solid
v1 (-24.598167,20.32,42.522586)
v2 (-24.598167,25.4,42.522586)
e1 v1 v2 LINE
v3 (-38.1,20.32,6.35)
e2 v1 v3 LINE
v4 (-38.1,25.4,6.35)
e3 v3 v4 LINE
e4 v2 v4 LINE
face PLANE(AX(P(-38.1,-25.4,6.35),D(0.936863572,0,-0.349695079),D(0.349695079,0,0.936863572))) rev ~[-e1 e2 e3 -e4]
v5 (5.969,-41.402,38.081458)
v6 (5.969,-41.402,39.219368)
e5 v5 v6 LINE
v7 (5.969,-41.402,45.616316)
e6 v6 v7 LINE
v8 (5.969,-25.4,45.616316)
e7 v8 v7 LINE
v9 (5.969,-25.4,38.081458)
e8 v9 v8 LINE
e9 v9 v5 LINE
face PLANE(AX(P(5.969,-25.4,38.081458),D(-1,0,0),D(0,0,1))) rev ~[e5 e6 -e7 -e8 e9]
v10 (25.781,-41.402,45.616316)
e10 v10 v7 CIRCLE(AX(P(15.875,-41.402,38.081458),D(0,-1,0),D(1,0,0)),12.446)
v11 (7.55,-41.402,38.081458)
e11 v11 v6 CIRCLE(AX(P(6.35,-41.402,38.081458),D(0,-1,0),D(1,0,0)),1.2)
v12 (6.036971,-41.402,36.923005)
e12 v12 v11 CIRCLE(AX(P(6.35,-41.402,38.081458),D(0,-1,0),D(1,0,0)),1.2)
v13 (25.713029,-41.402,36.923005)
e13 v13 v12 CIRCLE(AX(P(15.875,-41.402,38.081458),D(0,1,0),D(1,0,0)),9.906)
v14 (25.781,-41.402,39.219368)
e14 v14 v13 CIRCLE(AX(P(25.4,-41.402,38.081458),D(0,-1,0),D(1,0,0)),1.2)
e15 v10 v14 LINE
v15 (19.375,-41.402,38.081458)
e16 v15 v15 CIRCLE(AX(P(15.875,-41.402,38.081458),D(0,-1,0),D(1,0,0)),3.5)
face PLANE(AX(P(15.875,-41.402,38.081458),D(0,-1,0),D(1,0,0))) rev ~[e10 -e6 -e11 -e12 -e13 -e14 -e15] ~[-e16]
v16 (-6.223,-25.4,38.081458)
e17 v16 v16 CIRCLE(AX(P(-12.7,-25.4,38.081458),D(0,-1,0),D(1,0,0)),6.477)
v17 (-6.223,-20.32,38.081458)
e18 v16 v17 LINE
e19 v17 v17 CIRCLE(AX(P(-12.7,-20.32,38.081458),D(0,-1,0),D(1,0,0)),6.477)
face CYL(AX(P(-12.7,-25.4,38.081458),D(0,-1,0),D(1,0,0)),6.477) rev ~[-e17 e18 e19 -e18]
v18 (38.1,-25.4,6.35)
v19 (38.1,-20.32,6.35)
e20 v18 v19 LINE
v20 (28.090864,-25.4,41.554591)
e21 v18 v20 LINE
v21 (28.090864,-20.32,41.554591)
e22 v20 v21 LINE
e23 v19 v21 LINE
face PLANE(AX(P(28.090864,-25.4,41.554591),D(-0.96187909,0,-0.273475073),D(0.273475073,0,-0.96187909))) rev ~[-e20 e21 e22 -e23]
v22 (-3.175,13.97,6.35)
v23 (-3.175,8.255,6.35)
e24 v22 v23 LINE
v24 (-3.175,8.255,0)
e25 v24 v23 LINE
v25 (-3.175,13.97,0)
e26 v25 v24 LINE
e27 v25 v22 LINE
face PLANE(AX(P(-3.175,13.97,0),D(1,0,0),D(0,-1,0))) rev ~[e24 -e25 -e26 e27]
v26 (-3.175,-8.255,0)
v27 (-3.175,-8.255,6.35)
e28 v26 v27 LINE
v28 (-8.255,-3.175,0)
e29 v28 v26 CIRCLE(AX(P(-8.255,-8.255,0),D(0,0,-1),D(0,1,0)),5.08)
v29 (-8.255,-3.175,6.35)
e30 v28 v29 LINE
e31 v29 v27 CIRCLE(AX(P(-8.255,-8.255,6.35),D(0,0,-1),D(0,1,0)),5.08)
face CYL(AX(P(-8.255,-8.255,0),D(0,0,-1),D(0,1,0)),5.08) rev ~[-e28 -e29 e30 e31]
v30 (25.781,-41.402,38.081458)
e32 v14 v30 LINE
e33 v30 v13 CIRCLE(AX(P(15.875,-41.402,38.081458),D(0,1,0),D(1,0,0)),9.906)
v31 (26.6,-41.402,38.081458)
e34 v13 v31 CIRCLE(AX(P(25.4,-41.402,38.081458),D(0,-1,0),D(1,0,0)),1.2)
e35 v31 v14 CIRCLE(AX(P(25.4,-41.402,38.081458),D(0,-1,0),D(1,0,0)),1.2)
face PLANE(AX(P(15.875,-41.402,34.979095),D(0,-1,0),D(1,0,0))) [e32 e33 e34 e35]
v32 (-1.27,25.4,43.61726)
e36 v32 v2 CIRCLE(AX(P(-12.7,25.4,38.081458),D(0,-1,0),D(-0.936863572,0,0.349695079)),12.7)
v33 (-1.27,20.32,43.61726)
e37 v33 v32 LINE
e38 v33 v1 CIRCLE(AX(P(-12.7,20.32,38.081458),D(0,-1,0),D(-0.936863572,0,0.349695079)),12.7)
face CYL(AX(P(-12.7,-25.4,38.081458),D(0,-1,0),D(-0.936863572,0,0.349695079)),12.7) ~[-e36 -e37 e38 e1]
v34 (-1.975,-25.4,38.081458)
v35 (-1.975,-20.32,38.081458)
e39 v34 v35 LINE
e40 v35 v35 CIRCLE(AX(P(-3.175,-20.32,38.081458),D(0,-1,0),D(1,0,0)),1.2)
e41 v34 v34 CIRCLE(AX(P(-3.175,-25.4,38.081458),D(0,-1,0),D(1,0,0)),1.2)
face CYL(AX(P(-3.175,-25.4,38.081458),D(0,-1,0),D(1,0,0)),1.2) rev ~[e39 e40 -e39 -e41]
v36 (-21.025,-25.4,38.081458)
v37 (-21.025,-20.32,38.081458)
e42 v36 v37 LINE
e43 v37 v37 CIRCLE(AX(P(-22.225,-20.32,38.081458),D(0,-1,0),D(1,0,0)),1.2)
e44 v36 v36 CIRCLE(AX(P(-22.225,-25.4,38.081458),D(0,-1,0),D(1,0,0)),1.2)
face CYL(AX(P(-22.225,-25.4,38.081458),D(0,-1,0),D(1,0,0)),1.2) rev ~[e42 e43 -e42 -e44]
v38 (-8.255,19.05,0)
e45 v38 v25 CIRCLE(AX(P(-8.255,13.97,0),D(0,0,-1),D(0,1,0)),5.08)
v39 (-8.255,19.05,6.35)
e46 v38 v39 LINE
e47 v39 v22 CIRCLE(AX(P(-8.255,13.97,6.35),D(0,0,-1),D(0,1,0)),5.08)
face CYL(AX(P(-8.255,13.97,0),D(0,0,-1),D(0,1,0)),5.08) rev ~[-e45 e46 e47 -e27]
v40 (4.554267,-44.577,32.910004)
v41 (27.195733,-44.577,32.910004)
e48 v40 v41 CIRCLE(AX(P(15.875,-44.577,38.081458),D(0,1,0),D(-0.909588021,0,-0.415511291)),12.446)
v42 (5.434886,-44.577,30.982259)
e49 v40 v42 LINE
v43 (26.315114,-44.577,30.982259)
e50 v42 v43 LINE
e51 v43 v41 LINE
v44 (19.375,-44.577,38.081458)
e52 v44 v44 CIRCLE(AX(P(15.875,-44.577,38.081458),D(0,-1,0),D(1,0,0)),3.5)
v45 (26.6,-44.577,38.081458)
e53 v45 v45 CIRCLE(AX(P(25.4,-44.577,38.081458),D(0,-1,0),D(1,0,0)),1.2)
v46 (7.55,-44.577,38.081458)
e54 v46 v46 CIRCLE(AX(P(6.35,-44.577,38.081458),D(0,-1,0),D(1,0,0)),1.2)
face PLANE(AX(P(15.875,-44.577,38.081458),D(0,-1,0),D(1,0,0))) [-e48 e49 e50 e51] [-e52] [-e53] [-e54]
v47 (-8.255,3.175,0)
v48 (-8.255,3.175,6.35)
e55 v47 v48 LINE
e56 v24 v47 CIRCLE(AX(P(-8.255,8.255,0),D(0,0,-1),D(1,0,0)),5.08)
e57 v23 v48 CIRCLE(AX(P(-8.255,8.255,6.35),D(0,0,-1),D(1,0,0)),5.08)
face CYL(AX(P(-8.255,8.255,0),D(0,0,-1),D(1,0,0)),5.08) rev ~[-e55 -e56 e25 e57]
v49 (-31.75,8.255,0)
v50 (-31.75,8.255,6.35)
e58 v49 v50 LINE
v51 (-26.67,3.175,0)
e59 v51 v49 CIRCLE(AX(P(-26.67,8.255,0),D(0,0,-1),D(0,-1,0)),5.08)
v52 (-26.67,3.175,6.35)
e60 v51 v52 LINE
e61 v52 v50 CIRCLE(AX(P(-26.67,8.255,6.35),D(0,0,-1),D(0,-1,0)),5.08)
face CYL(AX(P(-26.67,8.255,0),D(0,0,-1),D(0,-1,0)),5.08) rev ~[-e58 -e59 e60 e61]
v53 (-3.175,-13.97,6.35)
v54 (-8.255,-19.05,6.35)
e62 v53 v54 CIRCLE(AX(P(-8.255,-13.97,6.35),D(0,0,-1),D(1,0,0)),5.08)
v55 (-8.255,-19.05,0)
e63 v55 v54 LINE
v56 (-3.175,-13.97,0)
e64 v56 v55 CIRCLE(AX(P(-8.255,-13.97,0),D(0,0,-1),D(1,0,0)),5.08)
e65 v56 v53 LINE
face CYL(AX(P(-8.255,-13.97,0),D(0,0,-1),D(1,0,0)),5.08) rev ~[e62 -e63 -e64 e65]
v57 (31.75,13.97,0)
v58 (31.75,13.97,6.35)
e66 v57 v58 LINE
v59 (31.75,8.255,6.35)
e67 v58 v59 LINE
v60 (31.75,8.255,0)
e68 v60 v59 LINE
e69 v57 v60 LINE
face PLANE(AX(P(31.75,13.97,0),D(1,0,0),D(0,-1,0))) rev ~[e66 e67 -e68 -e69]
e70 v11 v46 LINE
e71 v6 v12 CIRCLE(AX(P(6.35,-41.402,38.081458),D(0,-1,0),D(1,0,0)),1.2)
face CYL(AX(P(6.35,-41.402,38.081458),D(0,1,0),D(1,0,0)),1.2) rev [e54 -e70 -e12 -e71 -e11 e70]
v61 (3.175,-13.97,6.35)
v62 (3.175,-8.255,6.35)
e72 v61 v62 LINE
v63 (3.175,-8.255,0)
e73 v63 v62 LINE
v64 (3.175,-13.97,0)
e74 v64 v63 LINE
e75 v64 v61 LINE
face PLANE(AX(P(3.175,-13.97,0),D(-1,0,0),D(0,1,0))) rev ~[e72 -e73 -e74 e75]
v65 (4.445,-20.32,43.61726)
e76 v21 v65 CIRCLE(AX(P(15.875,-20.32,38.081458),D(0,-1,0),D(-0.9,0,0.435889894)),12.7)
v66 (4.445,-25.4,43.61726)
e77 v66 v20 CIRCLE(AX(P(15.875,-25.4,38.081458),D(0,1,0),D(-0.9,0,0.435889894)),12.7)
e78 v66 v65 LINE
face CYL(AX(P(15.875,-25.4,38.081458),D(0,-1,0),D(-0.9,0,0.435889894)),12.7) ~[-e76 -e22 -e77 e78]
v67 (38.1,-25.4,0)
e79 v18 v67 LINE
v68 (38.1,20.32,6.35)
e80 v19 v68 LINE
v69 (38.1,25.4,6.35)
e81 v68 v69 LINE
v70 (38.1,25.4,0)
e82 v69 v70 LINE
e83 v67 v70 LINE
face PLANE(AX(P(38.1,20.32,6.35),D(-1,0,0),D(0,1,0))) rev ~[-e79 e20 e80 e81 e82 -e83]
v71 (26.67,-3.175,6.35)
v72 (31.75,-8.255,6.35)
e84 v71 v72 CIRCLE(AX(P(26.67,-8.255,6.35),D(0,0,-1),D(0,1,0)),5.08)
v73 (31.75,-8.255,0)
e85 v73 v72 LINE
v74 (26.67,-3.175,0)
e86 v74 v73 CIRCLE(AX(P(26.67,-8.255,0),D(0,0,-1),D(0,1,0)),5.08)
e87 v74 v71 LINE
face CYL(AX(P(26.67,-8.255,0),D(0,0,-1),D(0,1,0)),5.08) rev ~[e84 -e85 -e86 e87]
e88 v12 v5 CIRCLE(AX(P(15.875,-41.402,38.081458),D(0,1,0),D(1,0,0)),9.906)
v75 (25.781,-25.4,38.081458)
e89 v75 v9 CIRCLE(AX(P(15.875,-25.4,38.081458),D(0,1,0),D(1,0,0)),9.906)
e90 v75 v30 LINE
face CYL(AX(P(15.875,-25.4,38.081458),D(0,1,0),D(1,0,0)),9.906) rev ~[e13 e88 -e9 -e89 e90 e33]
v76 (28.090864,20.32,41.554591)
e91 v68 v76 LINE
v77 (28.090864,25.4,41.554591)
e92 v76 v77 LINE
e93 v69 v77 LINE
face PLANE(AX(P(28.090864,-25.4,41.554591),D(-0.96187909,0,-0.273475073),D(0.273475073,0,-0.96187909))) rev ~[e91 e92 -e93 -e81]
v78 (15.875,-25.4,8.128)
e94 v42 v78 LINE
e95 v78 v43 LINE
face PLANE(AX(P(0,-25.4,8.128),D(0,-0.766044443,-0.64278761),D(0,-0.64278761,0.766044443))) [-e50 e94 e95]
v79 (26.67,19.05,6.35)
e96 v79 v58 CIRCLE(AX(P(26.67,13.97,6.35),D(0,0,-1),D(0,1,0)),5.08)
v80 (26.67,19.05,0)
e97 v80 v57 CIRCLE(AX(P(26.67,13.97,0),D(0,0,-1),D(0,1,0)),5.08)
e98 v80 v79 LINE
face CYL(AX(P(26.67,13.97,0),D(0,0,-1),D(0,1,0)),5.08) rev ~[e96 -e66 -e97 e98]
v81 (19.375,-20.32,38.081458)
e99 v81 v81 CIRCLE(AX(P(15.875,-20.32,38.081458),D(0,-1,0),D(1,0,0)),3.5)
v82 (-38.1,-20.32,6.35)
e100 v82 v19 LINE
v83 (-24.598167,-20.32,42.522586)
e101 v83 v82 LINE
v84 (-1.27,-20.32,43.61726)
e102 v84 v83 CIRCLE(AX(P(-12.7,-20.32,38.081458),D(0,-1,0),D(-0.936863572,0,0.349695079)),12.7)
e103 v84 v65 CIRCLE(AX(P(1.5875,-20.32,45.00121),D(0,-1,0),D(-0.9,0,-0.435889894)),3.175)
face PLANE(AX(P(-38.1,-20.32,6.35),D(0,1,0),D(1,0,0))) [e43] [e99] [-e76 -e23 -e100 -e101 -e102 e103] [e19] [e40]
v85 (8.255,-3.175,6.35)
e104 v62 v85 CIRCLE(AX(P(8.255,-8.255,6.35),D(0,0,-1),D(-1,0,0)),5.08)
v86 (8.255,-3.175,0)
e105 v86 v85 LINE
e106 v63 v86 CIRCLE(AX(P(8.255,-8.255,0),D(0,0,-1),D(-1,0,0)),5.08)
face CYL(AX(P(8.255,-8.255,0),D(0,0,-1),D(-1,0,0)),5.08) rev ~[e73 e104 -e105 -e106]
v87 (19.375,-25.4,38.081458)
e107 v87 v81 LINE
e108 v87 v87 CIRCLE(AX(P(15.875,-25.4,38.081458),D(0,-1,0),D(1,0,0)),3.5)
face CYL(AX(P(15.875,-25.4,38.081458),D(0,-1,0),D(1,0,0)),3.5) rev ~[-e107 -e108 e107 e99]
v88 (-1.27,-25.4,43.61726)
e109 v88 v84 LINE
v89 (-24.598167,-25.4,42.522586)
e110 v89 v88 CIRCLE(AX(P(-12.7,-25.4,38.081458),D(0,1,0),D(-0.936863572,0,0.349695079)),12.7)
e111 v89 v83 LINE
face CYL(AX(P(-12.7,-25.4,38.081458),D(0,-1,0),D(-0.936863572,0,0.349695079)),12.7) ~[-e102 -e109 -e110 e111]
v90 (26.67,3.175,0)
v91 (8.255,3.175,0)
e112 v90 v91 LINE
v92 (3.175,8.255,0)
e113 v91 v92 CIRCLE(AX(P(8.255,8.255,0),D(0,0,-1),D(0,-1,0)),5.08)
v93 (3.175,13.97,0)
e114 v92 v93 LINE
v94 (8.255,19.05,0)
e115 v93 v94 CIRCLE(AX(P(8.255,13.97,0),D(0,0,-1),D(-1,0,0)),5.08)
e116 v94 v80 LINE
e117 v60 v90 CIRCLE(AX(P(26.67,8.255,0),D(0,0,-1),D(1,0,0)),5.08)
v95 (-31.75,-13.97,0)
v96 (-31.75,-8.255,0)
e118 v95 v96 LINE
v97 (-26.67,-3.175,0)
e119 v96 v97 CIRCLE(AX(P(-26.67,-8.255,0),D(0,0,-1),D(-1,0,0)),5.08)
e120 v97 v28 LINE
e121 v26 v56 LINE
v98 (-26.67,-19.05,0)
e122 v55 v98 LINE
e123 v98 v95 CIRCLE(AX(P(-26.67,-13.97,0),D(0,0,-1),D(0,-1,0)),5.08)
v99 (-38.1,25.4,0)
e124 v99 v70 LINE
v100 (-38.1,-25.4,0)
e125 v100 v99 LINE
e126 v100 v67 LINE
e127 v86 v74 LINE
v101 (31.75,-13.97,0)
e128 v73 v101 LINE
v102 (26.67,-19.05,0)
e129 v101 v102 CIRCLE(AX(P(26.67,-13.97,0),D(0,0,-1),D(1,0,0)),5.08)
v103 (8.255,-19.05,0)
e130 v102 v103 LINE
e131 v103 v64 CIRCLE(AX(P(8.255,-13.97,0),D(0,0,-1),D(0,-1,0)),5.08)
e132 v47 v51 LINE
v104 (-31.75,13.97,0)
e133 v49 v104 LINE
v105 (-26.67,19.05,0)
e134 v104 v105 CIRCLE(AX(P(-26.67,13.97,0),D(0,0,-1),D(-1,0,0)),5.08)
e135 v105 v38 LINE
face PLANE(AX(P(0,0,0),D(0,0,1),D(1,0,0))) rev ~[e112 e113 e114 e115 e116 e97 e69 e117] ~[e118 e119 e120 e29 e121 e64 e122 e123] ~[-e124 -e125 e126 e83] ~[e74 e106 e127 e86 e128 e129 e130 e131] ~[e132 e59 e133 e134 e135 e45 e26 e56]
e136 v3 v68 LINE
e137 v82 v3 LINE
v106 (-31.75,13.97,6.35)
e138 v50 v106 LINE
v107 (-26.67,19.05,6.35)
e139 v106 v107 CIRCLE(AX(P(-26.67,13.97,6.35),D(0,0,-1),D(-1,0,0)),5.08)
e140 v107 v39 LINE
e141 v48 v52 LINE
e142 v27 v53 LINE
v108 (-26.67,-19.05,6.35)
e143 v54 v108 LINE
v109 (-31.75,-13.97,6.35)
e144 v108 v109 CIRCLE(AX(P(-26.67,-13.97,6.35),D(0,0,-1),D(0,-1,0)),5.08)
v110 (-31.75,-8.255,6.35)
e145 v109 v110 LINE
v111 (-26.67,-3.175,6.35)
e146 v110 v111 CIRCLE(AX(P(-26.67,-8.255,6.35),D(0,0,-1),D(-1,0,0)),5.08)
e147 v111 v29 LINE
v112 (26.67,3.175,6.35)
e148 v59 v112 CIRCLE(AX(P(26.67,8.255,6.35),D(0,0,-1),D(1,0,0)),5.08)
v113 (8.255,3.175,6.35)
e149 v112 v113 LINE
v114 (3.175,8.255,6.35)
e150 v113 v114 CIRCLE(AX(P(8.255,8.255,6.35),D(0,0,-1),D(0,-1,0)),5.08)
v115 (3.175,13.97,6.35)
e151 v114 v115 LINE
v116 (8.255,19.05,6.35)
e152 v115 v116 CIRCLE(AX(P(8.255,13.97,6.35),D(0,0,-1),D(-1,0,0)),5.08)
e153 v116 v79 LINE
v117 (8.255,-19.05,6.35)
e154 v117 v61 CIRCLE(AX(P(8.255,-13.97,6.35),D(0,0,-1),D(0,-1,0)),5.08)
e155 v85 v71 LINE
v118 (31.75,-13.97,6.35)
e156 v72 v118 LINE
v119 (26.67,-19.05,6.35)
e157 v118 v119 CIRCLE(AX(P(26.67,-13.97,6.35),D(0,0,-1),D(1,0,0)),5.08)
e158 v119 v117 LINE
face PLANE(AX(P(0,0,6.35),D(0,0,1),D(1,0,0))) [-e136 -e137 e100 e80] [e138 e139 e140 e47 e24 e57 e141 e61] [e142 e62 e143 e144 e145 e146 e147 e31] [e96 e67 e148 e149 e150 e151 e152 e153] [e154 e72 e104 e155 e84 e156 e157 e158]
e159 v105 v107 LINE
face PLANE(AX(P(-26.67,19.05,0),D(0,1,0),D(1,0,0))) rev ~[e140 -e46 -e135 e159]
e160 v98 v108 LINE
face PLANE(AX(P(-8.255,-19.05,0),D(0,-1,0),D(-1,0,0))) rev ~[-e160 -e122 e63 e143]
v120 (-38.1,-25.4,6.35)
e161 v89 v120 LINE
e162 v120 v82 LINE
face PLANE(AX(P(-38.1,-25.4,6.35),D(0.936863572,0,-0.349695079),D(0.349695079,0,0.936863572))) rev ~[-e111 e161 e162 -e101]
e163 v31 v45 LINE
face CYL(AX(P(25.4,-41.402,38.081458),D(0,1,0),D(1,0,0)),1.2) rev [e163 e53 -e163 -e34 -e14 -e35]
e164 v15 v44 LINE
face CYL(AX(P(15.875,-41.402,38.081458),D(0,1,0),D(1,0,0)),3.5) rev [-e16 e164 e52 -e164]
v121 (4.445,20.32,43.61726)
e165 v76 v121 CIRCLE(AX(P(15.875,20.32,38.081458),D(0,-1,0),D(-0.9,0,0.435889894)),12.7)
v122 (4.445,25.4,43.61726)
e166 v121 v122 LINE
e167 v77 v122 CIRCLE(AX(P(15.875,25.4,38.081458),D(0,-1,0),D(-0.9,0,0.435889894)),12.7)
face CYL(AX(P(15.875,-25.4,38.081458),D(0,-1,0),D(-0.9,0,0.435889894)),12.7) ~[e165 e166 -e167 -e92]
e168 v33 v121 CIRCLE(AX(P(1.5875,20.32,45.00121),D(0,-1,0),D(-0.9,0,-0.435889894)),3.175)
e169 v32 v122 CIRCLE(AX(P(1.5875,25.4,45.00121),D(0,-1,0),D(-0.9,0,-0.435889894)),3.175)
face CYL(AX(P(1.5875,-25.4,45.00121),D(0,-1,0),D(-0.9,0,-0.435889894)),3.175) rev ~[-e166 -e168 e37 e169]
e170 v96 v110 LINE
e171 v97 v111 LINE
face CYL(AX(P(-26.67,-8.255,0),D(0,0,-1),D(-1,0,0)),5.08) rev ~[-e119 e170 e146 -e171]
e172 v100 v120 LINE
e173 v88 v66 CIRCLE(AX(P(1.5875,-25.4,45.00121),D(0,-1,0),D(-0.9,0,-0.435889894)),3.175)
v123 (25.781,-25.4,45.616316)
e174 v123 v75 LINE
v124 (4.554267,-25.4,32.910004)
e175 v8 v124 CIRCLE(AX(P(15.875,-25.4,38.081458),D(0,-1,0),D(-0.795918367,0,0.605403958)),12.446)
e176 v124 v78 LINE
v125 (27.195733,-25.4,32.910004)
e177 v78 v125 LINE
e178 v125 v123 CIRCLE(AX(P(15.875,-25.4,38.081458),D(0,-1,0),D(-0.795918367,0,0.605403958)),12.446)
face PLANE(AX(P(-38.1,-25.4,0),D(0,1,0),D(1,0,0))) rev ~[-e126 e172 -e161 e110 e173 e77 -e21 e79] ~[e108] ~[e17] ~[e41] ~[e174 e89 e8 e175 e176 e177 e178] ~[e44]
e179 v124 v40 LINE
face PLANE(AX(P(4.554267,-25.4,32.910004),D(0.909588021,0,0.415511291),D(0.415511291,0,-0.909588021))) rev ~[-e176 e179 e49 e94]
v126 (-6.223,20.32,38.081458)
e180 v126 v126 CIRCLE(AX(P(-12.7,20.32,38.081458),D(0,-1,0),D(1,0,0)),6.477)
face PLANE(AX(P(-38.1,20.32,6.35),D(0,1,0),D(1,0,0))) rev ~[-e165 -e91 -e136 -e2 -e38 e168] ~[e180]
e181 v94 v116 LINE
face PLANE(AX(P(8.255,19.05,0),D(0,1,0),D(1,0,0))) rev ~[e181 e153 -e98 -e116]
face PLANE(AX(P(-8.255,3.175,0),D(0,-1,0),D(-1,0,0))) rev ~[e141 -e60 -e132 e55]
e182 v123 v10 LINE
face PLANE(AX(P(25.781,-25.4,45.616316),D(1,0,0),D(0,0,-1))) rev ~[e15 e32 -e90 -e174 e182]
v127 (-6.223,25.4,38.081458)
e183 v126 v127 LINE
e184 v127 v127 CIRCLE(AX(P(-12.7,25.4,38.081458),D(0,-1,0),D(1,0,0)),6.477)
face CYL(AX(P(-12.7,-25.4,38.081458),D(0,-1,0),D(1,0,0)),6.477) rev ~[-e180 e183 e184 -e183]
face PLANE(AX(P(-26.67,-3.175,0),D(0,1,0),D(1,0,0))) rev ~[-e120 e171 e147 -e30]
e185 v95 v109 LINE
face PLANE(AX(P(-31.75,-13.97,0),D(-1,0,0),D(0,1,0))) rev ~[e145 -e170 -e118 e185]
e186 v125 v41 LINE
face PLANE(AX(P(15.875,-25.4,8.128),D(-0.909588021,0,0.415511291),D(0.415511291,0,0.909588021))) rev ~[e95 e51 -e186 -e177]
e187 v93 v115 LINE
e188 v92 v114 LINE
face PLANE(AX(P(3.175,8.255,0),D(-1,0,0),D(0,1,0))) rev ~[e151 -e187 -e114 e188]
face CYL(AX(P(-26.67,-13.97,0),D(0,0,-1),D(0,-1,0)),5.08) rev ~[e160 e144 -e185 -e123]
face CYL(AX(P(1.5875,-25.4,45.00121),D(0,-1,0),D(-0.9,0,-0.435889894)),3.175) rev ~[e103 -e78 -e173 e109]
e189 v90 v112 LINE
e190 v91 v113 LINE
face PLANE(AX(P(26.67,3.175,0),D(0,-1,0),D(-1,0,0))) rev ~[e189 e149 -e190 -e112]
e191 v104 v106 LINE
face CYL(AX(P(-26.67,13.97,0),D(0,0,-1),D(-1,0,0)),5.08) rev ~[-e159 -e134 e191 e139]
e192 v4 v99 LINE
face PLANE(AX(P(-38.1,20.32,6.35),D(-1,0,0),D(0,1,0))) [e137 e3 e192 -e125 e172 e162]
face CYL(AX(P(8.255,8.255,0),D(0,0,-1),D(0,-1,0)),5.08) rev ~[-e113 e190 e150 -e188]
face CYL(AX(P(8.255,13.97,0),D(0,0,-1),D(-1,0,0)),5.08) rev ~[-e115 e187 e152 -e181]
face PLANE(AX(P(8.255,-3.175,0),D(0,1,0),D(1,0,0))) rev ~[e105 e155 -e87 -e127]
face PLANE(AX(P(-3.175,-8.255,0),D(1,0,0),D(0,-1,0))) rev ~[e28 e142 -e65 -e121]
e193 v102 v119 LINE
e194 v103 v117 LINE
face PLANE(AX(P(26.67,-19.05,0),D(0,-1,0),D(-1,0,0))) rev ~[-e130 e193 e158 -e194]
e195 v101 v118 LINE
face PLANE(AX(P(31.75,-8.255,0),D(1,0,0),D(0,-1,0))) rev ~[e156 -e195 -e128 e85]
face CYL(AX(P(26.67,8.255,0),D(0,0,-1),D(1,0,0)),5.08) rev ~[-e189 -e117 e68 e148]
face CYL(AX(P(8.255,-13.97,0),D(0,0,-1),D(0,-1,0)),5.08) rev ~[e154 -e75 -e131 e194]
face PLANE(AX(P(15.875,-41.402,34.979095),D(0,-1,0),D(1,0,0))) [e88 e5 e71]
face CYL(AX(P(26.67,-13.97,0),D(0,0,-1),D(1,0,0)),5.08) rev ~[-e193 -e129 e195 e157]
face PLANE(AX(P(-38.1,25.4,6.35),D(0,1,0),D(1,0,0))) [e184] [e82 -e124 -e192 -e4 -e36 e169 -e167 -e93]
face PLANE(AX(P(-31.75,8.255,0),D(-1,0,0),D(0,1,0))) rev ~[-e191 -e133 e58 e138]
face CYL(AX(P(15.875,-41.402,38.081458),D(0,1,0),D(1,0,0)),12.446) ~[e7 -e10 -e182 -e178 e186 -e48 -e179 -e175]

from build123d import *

# Parameters (mm, degrees)
F0_W           = 76.2
F0_H           = 50.8
F1_DEPTH       = 6.35
F2_W           = 76.2
F2_H           = 5.08
F3_DEPTH       = 101.6
F4_R           = 6.477
F5_DEPTH       = 50.801
F4_R_2         = 1.2
F4_R_3         = 3.5
F6_DEPTH       = 5.08
F8_DEPTH       = 16.002
F9_R           = 12.446
F9_R_2         = 1.2
F9_R_3         = 3.5
F10_DEPTH      = 3.175
F12_DEPTH      = 19.177
F14_DEPTH      = 38.101
F14_DEPTH_BACK = 38.101


# Not quite as in the source:
# - a feature names something its author has since deleted; it is built from what else it names


with BuildPart() as f1:
    # F0 (on Top) → F1 (new body)
    with BuildSketch(Plane.XY):
        Rectangle(F0_W, F0_H)
        with BuildLine():
            ThreePointArc((-31.75, -8.255), (-30.2621024484, -4.6628975516), (-26.67, -3.175))
            Line((-26.67, -3.175), (-8.255, -3.175))
            ThreePointArc((-8.255, -3.175), (-4.6628975516, -4.6628975516), (-3.175, -8.255))
            Line((-3.175, -8.255), (-3.175, -13.97))
            ThreePointArc((-3.175, -13.97), (-4.6628975516, -17.5621024484), (-8.255, -19.05))
            Line((-8.255, -19.05), (-26.67, -19.05))
            ThreePointArc((-26.67, -19.05), (-30.2621024484, -17.5621024484), (-31.75, -13.97))
            Line((-31.75, -13.97), (-31.75, -8.255))
        make_face(mode=Mode.SUBTRACT)
        with BuildLine():
            ThreePointArc((8.255, -19.05), (4.6628975516, -17.5621024484), (3.175, -13.97))
            Line((3.175, -13.97), (3.175, -8.255))
            ThreePointArc((3.175, -8.255), (4.6628975516, -4.6628975516), (8.255, -3.175))
            Line((8.255, -3.175), (26.67, -3.175))
            ThreePointArc((26.67, -3.175), (30.2621024484, -4.6628975516), (31.75, -8.255))
            Line((31.75, -8.255), (31.75, -13.97))
            ThreePointArc((31.75, -13.97), (30.2621024484, -17.5621024484), (26.67, -19.05))
            Line((26.67, -19.05), (8.255, -19.05))
        make_face(mode=Mode.SUBTRACT)
        with BuildLine():
            ThreePointArc((-31.75, 13.97), (-30.2621024484, 17.5621024484), (-26.67, 19.05))
            Line((-26.67, 19.05), (-8.255, 19.05))
            ThreePointArc((-8.255, 19.05), (-4.6628975516, 17.5621024484), (-3.175, 13.97))
            Line((-3.175, 13.97), (-3.175, 8.255))
            ThreePointArc((-3.175, 8.255), (-4.6628975516, 4.6628975516), (-8.255, 3.175))
            Line((-8.255, 3.175), (-26.67, 3.175))
            ThreePointArc((-26.67, 3.175), (-30.2621024484, 4.6628975516), (-31.75, 8.255))
            Line((-31.75, 8.255), (-31.75, 13.97))
        make_face(mode=Mode.SUBTRACT)
        with BuildLine():
            Line((31.75, 13.97), (31.75, 8.255))
            ThreePointArc((31.75, 8.255), (30.2621024484, 4.6628975516), (26.67, 3.175))
            Line((26.67, 3.175), (8.255, 3.175))
            ThreePointArc((8.255, 3.175), (4.6628975516, 4.6628975516), (3.175, 8.255))
            Line((3.175, 8.255), (3.175, 13.97))
            ThreePointArc((3.175, 13.97), (4.6628975516, 17.5621024484), (8.255, 19.05))
            Line((8.255, 19.05), (26.67, 19.05))
            ThreePointArc((26.67, 19.05), (30.2621024484, 17.5621024484), (31.75, 13.97))
        make_face(mode=Mode.SUBTRACT)
    extrude(amount=F1_DEPTH)

    # F2 (on face) → F3 (join)
    with BuildSketch(Plane.XY.offset(6.35)):
        with Locations((0, 22.86)):
            Rectangle(F2_W, F2_H)
        with Locations((0, -22.86)):
            Rectangle(F2_W, F2_H)
    extrude(amount=F3_DEPTH)

    # F4 (on face) → F5 (cut, through all)
    with BuildSketch(Plane.XZ.offset(25.4)):
        with BuildLine():
            Line((28.0908644484, 41.5545914238), (38.1, 6.35))
            Line((38.1, 6.35), (38.1, 107.95))
            Line((38.1, 107.95), (-38.1, 107.95))
            Line((-38.1, 107.95), (-38.1, 6.35))
            Line((-38.1, 6.35), (-24.5981673582, 42.522585505))
            ThreePointArc((-24.5981673582, 42.522585505), (-13.2952924023, 50.7674986335), (-1.27, 43.6172596583))
            ThreePointArc((-1.27, 43.6172596583), (1.5875, 41.8262100729), (4.445, 43.6172596583))
            ThreePointArc((4.445, 43.6172596583), (16.9786511198, 50.7334125607), (28.0908644484, 41.5545914238))
        make_face()
        with Locations((-12.7, 38.081458)):
            Circle(F4_R)
    extrude(amount=-F5_DEPTH, mode=Mode.SUBTRACT)

    # F4 (on face) → F6 (cut, through all)
    with BuildSketch(Plane.XZ.offset(25.4)):
        with Locations((-3.175, 38.081458)):
            Circle(F4_R_2)
        with Locations((-22.225, 38.081458)):
            Circle(F4_R_2)
        with Locations((15.875, 38.081458)):
            Circle(F4_R_3)
    extrude(amount=-F6_DEPTH, mode=Mode.SUBTRACT)

    # F7 (on face) → F8 (join)
    with BuildSketch(Plane.XZ.offset(25.4)):
        with BuildLine():
            ThreePointArc((25.781, 38.081458), (15.875, 28.175458), (5.969, 38.081458))
            Line((5.969, 38.081458), (5.969, 45.6163156629))
            ThreePointArc((5.969, 45.6163156629), (15.875, 25.635458), (25.781, 45.6163156629))
            Line((25.781, 45.6163156629), (25.781, 38.081458))
        make_face()
    extrude(amount=F8_DEPTH)

    # F9 (on face) → F10 (join)
    with BuildSketch(Plane.XZ.offset(41.402)):
        with Locations((15.875, 38.081458)):
            Circle(F9_R)
        with Locations((6.35, 38.081458)):
            Circle(F9_R_2, mode=Mode.SUBTRACT)
        with Locations((15.875, 38.081458)):
            Circle(F9_R_3, mode=Mode.SUBTRACT)
        with Locations((25.4, 38.081458)):
            Circle(F9_R_2, mode=Mode.SUBTRACT)
    extrude(amount=F10_DEPTH)

    # F11 (on face) → F12 (join, through all)
    with BuildSketch(Plane.XZ.offset(25.4)):
        with BuildLine():
            Line((4.5542674961, 32.9100044737), (15.875, 8.128))
            Line((15.875, 8.128), (27.1957325039, 32.9100044737))
            ThreePointArc((27.1957325039, 32.9100044737), (15.875, 25.635458), (4.5542674961, 32.9100044737))
        make_face()
    extrude(amount=F12_DEPTH)

    # F13 (on Right) → F14 (cut, two sides)
    with BuildSketch(Plane.YZ) as f14_sk:
        Polygon((-25.4, 8.128), (-44.577, 30.9822586452), (-44.577, 8.128), align=None)
    extrude(amount=-F14_DEPTH, mode=Mode.SUBTRACT)
    extrude(f14_sk.sketch, amount=F14_DEPTH_BACK, mode=Mode.SUBTRACT)


solid = f1.part
